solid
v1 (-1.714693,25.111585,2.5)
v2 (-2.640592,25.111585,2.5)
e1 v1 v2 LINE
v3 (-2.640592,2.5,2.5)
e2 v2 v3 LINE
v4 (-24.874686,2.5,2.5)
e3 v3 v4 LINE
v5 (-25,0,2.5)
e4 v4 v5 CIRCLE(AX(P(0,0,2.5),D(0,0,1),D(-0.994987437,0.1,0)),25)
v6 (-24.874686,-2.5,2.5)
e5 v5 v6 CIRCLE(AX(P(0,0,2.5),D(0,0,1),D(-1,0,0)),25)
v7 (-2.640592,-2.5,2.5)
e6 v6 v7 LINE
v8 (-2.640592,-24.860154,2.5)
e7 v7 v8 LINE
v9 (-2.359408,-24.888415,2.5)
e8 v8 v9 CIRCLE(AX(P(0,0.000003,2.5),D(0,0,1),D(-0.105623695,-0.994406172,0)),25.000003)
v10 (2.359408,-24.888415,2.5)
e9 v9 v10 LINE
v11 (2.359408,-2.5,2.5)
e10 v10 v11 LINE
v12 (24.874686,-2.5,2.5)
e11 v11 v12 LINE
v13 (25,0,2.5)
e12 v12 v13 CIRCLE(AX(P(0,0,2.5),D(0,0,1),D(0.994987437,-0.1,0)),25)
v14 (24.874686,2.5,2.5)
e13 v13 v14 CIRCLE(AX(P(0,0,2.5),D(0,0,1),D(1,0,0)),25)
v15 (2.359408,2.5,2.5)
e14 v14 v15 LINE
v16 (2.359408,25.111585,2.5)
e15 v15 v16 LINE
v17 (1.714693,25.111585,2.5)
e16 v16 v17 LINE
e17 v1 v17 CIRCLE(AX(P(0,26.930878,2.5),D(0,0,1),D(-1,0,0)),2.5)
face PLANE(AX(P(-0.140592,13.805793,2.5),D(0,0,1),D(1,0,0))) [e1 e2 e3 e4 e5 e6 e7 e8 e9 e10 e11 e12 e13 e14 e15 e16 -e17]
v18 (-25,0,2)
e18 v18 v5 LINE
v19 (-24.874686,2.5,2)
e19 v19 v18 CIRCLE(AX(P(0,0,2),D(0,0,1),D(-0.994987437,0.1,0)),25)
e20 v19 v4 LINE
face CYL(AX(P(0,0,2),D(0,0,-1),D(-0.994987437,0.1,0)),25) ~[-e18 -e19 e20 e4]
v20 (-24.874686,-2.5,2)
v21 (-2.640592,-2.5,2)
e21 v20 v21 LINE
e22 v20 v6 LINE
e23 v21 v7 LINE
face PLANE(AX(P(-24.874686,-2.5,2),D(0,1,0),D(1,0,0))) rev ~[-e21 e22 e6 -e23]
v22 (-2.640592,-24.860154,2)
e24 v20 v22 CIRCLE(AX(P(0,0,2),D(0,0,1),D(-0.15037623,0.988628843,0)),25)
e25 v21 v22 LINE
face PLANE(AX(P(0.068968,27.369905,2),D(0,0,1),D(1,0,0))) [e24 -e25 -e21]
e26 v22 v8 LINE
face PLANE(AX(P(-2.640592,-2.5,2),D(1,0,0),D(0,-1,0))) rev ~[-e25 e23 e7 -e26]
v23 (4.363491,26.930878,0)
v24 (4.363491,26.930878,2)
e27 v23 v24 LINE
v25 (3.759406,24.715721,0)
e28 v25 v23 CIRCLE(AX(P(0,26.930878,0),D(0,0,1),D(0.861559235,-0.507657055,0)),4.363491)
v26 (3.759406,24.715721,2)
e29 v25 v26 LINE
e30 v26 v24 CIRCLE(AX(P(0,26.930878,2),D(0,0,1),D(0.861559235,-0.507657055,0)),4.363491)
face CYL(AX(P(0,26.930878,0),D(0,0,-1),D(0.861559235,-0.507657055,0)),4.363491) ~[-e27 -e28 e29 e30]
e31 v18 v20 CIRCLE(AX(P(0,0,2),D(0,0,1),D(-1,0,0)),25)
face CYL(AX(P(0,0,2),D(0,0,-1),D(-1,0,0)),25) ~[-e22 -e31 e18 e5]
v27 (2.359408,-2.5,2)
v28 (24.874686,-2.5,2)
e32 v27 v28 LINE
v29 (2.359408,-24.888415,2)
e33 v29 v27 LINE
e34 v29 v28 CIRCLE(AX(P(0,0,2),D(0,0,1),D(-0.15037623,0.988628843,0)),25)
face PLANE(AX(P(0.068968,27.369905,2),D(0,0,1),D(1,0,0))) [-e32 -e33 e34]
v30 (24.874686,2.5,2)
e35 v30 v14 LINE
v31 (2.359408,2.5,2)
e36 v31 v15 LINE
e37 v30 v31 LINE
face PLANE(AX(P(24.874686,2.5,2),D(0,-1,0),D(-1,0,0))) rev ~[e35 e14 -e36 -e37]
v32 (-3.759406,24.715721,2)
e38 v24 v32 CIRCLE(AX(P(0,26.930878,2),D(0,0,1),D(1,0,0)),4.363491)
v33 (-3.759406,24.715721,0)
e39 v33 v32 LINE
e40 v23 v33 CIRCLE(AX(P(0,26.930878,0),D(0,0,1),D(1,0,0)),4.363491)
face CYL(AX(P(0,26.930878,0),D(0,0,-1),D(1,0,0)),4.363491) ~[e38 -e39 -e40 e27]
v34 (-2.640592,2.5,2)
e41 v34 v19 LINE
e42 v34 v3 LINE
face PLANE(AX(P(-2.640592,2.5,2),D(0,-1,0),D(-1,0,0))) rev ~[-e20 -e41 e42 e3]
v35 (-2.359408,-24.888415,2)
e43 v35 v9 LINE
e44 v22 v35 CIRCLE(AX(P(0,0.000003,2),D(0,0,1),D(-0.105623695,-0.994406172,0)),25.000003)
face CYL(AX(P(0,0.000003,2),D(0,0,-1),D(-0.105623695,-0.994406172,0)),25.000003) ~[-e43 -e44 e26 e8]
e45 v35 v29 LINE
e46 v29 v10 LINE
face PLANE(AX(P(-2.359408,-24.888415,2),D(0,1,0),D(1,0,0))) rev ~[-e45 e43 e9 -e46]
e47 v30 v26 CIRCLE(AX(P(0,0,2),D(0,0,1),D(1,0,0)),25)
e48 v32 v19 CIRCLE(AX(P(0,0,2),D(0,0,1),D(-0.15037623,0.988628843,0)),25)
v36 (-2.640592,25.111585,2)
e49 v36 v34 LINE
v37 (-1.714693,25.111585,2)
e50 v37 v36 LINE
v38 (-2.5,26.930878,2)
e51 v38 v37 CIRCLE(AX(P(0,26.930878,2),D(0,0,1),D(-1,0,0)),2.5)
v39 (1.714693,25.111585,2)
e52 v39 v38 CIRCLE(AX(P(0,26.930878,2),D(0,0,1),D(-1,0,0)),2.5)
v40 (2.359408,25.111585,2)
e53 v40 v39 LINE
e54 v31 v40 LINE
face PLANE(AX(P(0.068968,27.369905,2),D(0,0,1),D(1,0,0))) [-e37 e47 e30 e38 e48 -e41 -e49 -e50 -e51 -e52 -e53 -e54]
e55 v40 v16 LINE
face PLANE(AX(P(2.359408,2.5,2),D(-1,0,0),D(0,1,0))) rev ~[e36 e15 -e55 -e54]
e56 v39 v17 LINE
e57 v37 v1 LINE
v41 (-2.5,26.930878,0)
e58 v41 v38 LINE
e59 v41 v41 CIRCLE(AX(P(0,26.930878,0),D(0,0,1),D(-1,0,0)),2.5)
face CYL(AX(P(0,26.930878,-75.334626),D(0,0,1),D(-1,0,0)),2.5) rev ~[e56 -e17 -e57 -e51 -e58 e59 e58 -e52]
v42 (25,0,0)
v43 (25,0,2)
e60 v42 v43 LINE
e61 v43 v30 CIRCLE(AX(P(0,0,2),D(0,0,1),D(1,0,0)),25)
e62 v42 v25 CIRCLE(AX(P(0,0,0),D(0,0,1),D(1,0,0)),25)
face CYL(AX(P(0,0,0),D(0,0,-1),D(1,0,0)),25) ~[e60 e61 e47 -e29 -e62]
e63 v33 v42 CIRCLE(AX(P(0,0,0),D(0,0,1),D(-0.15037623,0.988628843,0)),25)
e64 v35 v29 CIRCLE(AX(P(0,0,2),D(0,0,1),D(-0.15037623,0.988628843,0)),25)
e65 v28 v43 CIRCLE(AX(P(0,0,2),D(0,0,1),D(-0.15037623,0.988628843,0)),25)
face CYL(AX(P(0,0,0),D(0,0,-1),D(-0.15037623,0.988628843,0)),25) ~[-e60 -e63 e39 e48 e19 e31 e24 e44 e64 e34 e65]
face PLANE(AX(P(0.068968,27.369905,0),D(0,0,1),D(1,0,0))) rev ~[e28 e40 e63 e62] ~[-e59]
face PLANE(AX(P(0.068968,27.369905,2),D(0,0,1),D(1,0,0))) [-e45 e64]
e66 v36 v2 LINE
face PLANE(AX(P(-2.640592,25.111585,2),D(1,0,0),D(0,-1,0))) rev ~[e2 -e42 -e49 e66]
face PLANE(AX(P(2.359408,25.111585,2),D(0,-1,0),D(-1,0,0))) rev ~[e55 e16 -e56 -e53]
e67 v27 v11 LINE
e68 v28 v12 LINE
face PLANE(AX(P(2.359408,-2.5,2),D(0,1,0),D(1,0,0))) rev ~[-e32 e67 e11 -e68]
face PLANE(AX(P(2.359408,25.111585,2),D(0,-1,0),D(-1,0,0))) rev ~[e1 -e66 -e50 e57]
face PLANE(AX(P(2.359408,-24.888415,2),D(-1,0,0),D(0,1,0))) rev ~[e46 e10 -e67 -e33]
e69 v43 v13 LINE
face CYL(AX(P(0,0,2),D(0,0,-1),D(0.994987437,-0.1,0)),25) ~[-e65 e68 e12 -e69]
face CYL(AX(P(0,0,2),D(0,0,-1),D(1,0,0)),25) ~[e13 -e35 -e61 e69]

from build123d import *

# Parameters (mm, degrees)
F1_DEPTH = 2
F2_W     = 5
F2_H     = 5
F3_DEPTH = 0.5
F4_D     = 5


# Not quite as in the source:
# - a feature names something its author has since deleted; it is built from what else it names


with BuildPart() as f1:
    # F0 (on Top) → F1 (new body)
    with BuildSketch(Plane.XY):
        with BuildLine():
            ThreePointArc((-3.7594057481, 24.7157210783), (0, 25), (3.7594057481, 24.7157210783))
            ThreePointArc((3.7594057481, 24.7157210783), (4.209761495, 25.7828537011), (4.3634907466, 26.9308779389))
            ThreePointArc((4.3634907466, 26.9308779389), (-1.1480242378, 31.1406394339), (-3.7594057481, 24.7157210783))
        make_face()
        with BuildLine():
            ThreePointArc((-3.7594057481, 24.7157210783), (0, 22.5673871923), (3.7594057481, 24.7157210783))
            ThreePointArc((3.7594057481, 24.7157210783), (0, 25), (-3.7594057481, 24.7157210783))
        make_face()
        with BuildLine():
            ThreePointArc((-3.7594057481, 24.7157210783), (-16.2943986741, -18.9602893399), (25, 0))
            ThreePointArc((25, 0), (18.9602893399, 16.2943986741), (3.7594057481, 24.7157210783))
            ThreePointArc((3.7594057481, 24.7157210783), (0, 22.5673871923), (-3.7594057481, 24.7157210783))
        make_face()
    extrude(amount=F1_DEPTH)

    # F2 (on face) → F3 (join)
    with BuildSketch(Plane.XY.offset(2)):
        Polygon((-2.640592387, 25.1115851104), (-2.640592387, 2.5), (2.359407613, 2.5), (2.359407613, 25.1115851104), (-0.140592387, 25.1115851104), align=None)
        with BuildLine():
            Line((-2.640592387, 2.5), (-24.8746859277, 2.5))
            ThreePointArc((-24.8746859277, 2.5), (-24.9686518278, 1.2515693765), (-25, 0))
            ThreePointArc((-25, 0), (-24.9686518278, -1.2515693765), (-24.8746859277, -2.5))
            Line((-24.8746859277, -2.5), (-2.640592387, -2.5))
            Line((-2.640592387, -2.5), (-2.640592387, 2.5))
        make_face()
        with Locations((-0.140592387, 0)):
            Rectangle(F2_W, F2_H)
        with BuildLine():
            Line((24.8746859277, 2.5), (2.359407613, 2.5))
            Line((2.359407613, 2.5), (2.359407613, -2.5))
            Line((2.359407613, -2.5), (24.8746859277, -2.5))
            ThreePointArc((24.8746859277, -2.5), (24.9686518278, -1.2515693765), (25, 0))
            ThreePointArc((25, 0), (24.9686518278, 1.2515693765), (24.8746859277, 2.5))
        make_face()
        with BuildLine():
            Line((2.359407613, -2.5), (-2.640592387, -2.5))
            Line((-2.640592387, -2.5), (-2.640592387, -24.8601543005))
            ThreePointArc((-2.640592387, -24.8601543005), (-2.5000399327, -24.8746819142), (-2.359407613, -24.8884148896))
            Line((-2.359407613, -24.8884148896), (-0.140592387, -24.8884148896))
            Line((-0.140592387, -24.8884148896), (2.359407613, -24.8884148896))
            Line((2.359407613, -24.8884148896), (2.359407613, -2.5))
        make_face()
    extrude(amount=F3_DEPTH)

    # F4 (through all)
    with Locations(Plane(origin=(0, 0, 0), x_dir=(1, 0, 0), z_dir=(0, 0, -1))):
        with Locations((0, -26.9308779389)):
            Hole(F4_D / 2)


solid = f1.part
